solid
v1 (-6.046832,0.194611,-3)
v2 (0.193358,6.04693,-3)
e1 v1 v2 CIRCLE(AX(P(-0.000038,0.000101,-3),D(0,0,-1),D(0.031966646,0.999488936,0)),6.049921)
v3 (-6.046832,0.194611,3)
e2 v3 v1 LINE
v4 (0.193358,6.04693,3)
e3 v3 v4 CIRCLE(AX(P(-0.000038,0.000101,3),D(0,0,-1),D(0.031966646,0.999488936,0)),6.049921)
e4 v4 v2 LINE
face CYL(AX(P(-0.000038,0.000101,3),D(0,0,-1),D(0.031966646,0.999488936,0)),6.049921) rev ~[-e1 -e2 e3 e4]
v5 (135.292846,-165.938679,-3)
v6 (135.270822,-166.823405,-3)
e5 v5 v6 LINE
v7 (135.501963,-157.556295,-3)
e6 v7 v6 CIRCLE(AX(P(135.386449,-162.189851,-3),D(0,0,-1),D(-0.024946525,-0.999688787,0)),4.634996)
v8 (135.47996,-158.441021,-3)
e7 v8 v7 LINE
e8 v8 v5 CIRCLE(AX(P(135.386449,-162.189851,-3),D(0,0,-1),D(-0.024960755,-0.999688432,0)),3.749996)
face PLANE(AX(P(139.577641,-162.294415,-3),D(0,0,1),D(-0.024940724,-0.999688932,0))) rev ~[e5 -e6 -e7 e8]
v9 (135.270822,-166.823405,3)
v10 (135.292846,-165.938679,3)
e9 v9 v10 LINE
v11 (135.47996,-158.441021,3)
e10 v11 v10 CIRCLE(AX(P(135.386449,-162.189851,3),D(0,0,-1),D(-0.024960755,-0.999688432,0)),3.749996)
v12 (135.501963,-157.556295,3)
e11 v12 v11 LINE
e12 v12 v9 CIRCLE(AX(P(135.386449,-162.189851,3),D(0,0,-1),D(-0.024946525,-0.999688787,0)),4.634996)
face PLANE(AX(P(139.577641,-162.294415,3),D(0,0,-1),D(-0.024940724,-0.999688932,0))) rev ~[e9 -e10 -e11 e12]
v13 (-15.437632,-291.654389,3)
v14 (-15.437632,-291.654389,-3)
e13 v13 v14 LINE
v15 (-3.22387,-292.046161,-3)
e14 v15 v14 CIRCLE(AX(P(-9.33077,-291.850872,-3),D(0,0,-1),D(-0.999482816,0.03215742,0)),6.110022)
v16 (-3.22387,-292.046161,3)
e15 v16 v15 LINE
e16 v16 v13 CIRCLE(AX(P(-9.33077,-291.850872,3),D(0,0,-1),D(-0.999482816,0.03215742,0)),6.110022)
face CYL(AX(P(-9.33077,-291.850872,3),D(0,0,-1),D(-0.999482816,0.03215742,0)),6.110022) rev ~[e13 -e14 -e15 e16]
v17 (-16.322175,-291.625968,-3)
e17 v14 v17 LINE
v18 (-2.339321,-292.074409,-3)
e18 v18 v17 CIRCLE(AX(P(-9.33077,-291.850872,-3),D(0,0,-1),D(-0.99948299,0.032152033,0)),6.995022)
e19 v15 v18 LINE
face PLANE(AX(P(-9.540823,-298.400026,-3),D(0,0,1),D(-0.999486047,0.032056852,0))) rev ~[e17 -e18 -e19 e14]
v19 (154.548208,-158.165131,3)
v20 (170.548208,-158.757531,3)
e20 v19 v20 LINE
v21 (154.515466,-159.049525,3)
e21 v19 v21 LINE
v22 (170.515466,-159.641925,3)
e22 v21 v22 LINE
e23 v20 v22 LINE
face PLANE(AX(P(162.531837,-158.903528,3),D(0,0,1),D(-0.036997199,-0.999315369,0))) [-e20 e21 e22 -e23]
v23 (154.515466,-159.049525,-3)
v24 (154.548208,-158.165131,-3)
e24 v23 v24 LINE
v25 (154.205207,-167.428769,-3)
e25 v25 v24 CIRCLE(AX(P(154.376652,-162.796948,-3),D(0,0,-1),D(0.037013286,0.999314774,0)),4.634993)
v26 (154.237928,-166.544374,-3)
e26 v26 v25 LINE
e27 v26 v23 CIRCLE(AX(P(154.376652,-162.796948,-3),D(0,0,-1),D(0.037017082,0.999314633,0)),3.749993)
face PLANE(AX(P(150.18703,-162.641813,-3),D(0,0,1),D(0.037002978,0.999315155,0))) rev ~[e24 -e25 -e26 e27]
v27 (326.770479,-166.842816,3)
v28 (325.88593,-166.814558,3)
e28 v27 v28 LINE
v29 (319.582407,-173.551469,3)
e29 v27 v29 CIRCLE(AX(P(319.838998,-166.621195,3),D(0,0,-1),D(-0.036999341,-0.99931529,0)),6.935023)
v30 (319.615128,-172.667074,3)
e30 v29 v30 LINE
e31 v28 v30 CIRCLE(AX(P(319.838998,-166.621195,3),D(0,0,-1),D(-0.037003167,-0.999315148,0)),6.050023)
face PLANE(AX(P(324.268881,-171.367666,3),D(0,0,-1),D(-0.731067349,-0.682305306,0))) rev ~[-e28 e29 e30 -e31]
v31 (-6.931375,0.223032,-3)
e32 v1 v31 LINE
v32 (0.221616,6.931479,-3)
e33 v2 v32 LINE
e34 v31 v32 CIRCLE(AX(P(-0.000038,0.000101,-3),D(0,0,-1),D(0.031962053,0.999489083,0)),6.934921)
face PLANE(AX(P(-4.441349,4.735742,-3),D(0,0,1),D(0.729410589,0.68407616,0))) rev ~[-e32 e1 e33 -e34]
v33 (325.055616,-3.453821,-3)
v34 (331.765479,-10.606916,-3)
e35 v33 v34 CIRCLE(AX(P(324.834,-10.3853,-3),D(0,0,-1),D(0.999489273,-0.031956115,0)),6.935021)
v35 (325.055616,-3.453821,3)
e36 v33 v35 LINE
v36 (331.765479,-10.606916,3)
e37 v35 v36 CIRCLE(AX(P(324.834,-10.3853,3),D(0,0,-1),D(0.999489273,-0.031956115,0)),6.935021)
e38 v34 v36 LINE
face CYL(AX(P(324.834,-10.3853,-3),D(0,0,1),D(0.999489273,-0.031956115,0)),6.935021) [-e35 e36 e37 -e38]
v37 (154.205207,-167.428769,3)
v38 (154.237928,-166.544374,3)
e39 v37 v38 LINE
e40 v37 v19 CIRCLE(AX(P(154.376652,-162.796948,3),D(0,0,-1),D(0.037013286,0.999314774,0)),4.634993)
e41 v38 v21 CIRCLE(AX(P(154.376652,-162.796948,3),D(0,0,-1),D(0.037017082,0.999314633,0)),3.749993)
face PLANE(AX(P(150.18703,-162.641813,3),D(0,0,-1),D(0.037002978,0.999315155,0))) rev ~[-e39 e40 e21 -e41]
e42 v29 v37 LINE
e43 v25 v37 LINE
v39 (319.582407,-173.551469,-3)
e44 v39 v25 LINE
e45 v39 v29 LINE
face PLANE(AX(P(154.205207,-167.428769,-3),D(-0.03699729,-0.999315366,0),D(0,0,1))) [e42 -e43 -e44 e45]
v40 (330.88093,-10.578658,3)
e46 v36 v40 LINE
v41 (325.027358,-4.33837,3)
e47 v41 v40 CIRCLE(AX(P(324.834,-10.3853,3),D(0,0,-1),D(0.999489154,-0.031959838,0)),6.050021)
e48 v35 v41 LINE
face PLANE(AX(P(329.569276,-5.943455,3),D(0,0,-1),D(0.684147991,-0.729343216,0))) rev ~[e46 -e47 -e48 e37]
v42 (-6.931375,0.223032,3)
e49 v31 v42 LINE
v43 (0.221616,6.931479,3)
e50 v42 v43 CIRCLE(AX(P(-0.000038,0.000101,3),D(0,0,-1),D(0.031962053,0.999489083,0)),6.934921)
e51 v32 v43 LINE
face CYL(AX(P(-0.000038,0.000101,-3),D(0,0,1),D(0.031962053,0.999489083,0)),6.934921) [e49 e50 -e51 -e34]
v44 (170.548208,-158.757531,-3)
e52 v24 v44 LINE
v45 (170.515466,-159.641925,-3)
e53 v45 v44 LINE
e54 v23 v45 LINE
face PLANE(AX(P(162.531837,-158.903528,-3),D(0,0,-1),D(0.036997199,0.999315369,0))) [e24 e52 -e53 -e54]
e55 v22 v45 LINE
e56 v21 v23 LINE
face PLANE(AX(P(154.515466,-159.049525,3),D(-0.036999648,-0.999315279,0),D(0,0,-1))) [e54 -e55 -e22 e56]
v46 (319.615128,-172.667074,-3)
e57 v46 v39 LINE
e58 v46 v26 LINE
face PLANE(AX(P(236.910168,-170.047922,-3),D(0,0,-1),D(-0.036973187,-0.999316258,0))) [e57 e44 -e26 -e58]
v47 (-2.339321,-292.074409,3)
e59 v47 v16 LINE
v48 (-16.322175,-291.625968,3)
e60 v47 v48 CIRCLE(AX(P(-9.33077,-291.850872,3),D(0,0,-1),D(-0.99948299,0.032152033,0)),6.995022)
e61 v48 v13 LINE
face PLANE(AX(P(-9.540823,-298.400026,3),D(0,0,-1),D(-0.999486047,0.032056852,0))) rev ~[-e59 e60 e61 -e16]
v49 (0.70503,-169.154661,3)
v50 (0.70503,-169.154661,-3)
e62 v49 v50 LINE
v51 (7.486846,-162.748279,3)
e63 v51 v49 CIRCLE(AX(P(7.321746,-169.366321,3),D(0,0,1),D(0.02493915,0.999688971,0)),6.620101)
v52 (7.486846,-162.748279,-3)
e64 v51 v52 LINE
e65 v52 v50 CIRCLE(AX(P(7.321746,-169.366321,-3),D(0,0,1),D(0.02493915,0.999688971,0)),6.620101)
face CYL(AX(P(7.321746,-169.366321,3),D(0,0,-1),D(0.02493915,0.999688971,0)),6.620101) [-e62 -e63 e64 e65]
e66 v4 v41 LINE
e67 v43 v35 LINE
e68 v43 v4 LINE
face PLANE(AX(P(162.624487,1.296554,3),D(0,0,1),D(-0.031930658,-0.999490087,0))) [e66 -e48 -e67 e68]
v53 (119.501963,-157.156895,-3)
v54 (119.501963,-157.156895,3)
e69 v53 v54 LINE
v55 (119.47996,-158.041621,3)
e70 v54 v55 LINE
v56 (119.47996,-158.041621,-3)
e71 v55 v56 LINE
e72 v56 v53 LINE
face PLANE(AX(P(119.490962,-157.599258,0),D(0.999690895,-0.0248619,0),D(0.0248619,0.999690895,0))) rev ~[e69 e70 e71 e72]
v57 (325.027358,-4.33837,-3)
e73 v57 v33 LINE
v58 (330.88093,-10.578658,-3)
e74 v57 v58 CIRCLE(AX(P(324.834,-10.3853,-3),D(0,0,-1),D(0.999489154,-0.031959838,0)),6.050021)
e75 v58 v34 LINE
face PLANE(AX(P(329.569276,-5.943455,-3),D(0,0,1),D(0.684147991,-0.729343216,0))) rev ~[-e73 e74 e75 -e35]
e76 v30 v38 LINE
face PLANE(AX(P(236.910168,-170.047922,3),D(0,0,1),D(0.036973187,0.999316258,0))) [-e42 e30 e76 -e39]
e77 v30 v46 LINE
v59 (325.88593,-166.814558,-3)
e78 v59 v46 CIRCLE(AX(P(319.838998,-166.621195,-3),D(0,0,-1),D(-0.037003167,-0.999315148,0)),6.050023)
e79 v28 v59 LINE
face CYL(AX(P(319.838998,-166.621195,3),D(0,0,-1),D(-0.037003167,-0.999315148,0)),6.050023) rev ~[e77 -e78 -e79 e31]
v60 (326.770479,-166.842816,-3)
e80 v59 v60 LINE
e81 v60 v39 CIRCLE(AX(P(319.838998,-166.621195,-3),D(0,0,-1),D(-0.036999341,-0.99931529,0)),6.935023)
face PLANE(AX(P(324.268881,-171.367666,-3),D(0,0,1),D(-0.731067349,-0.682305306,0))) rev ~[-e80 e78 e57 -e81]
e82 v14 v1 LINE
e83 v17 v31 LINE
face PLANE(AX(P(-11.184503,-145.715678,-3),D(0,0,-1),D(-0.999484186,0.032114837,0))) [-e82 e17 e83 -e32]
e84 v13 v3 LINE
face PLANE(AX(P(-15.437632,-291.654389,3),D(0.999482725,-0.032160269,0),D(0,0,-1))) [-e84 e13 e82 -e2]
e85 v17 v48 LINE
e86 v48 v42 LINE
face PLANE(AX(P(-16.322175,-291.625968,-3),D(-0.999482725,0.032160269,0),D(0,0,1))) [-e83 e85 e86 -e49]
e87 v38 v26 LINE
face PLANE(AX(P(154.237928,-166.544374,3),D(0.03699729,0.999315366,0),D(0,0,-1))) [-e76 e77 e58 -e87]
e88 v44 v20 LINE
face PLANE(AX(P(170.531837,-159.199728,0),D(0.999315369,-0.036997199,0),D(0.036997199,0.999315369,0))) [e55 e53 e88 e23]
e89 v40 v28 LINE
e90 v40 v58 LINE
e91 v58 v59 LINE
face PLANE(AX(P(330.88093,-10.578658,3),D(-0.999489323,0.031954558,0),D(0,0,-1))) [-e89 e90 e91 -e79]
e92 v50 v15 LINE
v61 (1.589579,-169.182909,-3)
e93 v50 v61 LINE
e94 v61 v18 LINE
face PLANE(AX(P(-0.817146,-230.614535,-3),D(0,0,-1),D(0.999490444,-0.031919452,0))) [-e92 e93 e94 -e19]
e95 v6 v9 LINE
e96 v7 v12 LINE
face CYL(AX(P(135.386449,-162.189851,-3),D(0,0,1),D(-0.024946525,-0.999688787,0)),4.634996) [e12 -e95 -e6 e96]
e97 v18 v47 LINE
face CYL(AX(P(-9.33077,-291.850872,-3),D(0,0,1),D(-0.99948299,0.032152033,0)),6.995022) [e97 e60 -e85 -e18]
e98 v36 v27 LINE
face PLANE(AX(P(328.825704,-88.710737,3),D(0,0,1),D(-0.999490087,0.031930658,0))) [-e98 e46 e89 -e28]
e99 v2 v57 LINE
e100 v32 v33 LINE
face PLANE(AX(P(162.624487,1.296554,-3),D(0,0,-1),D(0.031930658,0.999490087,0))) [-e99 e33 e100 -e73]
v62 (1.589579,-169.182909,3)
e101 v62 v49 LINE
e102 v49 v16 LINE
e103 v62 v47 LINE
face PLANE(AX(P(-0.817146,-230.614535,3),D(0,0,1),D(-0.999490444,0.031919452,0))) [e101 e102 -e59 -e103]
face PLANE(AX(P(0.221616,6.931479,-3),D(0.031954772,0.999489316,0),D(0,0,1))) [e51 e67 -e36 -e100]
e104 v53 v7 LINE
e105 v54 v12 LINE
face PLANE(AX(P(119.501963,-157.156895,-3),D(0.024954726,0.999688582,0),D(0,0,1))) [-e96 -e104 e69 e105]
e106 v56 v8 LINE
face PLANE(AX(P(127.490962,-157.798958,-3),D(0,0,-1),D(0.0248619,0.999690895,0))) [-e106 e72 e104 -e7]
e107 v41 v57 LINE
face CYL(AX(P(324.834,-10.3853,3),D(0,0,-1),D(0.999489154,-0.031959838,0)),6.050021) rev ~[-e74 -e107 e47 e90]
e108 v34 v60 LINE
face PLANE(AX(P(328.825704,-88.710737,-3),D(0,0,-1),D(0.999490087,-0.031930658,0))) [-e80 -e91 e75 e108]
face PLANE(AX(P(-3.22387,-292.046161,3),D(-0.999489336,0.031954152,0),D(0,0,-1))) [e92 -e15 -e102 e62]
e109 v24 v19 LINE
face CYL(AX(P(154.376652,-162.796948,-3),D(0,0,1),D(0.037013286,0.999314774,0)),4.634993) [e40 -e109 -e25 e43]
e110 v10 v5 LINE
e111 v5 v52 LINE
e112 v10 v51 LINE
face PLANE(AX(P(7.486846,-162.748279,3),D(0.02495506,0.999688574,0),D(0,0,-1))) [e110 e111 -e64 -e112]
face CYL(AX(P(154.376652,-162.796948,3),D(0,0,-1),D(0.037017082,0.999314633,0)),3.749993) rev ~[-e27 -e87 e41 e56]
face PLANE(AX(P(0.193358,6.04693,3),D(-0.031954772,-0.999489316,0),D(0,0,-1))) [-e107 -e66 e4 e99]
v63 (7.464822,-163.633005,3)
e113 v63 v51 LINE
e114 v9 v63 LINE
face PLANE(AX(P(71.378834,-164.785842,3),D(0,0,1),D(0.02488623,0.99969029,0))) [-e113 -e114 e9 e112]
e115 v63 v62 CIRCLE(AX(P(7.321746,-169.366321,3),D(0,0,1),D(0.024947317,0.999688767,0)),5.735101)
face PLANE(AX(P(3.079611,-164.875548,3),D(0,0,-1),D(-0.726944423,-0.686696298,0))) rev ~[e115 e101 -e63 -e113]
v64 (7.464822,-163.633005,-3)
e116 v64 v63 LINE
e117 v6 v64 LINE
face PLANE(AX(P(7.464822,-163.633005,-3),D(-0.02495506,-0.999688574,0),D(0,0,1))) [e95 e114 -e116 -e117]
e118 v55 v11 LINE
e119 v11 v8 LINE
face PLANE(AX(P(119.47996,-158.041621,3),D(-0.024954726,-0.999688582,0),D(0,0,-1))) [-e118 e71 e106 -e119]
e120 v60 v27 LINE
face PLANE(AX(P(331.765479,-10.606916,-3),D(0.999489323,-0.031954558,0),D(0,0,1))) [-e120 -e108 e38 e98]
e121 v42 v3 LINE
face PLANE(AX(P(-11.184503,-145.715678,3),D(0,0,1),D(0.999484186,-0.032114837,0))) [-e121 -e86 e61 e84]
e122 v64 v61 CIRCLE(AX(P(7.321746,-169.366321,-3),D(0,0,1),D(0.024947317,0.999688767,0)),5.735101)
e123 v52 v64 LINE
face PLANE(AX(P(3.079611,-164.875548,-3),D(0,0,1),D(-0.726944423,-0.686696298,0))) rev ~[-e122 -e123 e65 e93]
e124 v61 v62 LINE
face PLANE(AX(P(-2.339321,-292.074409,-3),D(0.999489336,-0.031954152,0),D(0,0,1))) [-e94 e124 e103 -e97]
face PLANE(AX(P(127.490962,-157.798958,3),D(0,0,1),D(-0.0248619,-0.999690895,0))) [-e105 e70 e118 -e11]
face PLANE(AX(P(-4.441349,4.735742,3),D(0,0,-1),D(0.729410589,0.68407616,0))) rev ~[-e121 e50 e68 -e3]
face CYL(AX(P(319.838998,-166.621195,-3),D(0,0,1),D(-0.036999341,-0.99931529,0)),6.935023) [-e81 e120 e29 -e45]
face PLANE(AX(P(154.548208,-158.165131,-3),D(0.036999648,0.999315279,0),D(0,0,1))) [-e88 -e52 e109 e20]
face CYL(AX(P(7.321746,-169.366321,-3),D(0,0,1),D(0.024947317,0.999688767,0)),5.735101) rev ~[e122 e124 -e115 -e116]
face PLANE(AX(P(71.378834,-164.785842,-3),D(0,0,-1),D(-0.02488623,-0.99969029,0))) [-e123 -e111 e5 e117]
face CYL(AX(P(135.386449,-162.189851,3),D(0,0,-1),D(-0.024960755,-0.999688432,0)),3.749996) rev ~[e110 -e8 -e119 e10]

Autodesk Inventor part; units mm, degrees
ref_plane "YZ Plane" through (0, 0, 0) normal (1, 0, 0) x (0, 1, 0)
ref_plane "XZ Plane" through (0, 0, 0) normal (0, 1, 0) x (-1, 0, 0)
sketch "Sketch1" plane through (0, 0, 0) normal (0, 0, 1) x (1, 0, 0)
  circle A0 centre (0, 0) radius 6.05
surface extrude "ExtrusionSrf1" sketch "Sketch1" along normal mid plane 6 shown yes curves A0
sketch "Sketch2" plane through (0, 0, 0) normal (0, 0, 1) x (1, 0, 0)
  circle A0 centre (324.834, -10.3853) radius 6.05
  point P0 (0, 0)
surface extrude "ExtrusionSrf2" sketch "Sketch2" along normal mid plane 6 shown yes curves A0
sketch "Sketch3" plane through (0, 0, 0) normal (0, 0, 1) x (1, 0, 0)
  circle A0 centre (-9.3308, -291.8509) radius 6.11
  point P0 (0, 0)
surface extrude "ExtrusionSrf3" sketch "Sketch3" along normal blind 6 shown yes curves A0
sketch "Sketch4" plane through (0, 0, 0) normal (0, 0, 1) x (1, 0, 0)
  circle A0 centre (7.3217, -169.3662) radius 5.735
  point P0 (0, 0)
surface extrude "ExtrusionSrf4" sketch "Sketch4" along normal mid plane 6 shown yes curves A0
sketch "Sketch5" plane through (0, 0, 0) normal (0, 0, 1) x (1, 0, 0)
  circle A0 centre (319.839, -166.6212) radius 6.05
  point P0 (0, 0)
surface extrude "ExtrusionSrf5" sketch "Sketch5" along normal mid plane 6 shown yes curves A0
sketch "Sketch6" plane through (0, 0, 0) normal (0, 0, 1) x (1, 0, 0)
  circle A0 centre (135.3864, -162.1898) radius 3
  point P0 (0, 0)
surface extrude "ExtrusionSrf6" sketch "Sketch6" along normal mid plane 6 shown yes curves A0
sketch "Sketch7" plane through (0, 0, 0) normal (0, 0, 1) x (1, 0, 0)
  circle A0 centre (154.3767, -162.797) radius 3
  point P0 (0, 0)
surface extrude "ExtrusionSrf7" sketch "Sketch7" along normal mid plane 6 shown yes curves A0
sketch "Sketch8" plane through (0, 0, 0) normal (0, 0, 1) x (1, 0, 0)
  circle A0 centre (0, 0) radius 6.05 projected
  circle A1 centre (7.3217, -169.3662) radius 5.735 projected
  circle A2 centre (-9.3308, -291.8509) radius 6.11 projected
  circle A3 centre (135.3864, -162.1898) radius 3 projected
  circle A4 centre (154.3767, -162.797) radius 3 projected
  circle A5 centre (319.839, -166.6212) radius 6.05 projected
  circle A6 centre (324.834, -10.3853) radius 6.05 projected
  arc A7 (0.2015, 6.3018) -> (-6.3017, 0.2028) centre (0, 0) ccw
  arc A8 (-15.6925, -291.6462) -> (-2.969, -292.0543) centre (-9.3308, -291.8509) ccw
  arc A9 (7.4805, -163.0032) -> (0.9599, -169.1628) centre (7.3217, -169.3662) ccw
  arc A10 (135.2865, -166.1936) -> (135.4863, -158.1861) centre (135.3864, -162.1898) ccw
  arc A11 (331.1358, -10.5868) -> (325.0355, -4.0835) centre (324.834, -10.3853) ccw
  arc A12 (154.5249, -158.7947) -> (154.2285, -166.7992) centre (154.3767, -162.797) ccw
  arc A13 (319.6057, -172.9219) -> (326.1408, -166.8227) centre (319.839, -166.6212) ccw
  line L0 (-15.6925, -291.6462) -> (-6.3017, 0.2028)
  line L1 (0.2015, 6.3018) -> (325.0355, -4.0835)
  line L2 (-2.969, -292.0543) -> (0.9599, -169.1628)
  line L3 (7.4805, -163.0032) -> (135.2865, -166.1936)
  line L4 (331.1358, -10.5868) -> (326.1408, -166.8227)
  line L5 (119.4863, -157.7867) -> (135.4863, -158.1861)
  line L6 (154.2285, -166.7992) -> (319.6057, -172.9219)
  line L7 (154.5249, -158.7947) -> (170.5249, -159.3871)
  dimension "d14" = 0.255
  dimension "d15" = 0.255
  dimension "d16" = 0.255
  dimension "d17" = 0.63
  dimension "d19" = 0.255
  dimension "d22" = 1.005
  dimension "d23" = 1.005
  dimension "d34" = 16
  dimension "d35" = 16
ref_plane "Work Plane2" through (170.5249, -159.3871, 0) normal (0.9993154, -0.0369972, 0) x (0.0369972, 0.9993154, 0)
sketch "Sketch10" plane through (170.5249, -159.3871, 0) normal (0.9993154, -0.0369972, 0) x (0.0369972, 0.9993154, 0)
  line L0 (0.63, 3) -> (-0.255, 3)
  line L1 (-0.255, 3) -> (-0.255, -3)
  line L2 (-0.255, -3) -> (0.63, -3)
  line L3 (0.63, -3) -> (0.63, 3)
  line L4 (0.63, 0) -> (-0.255, 0) construction
  point P0 (152.969, 0)
  point P1 (0, 0)
  dimension "d29" = 6
  dimension "d30" = 0.63
  dimension "d31" = 0.255
sweep "Sweep2" add profiles "Sketch10" path "Sketch8" path curves L7 A12 L6 A13 L4 A11 L1 A7 L0 A8 L2 A9 L3 A10 L5
equation "\"d14\" = inside"
equation "\"d15\" = inside"
equation "\"d16\" = inside"
equation "\"d17\" = backside"
equation "\"d19\" = inside"
equation "\"d30\" = backside"
equation "\"d31\" = inside"
equation "\"inside\" = 0.255"
equation "\"backside\" = 0.63"
properties part number "Belt 1" material "Rubber"
